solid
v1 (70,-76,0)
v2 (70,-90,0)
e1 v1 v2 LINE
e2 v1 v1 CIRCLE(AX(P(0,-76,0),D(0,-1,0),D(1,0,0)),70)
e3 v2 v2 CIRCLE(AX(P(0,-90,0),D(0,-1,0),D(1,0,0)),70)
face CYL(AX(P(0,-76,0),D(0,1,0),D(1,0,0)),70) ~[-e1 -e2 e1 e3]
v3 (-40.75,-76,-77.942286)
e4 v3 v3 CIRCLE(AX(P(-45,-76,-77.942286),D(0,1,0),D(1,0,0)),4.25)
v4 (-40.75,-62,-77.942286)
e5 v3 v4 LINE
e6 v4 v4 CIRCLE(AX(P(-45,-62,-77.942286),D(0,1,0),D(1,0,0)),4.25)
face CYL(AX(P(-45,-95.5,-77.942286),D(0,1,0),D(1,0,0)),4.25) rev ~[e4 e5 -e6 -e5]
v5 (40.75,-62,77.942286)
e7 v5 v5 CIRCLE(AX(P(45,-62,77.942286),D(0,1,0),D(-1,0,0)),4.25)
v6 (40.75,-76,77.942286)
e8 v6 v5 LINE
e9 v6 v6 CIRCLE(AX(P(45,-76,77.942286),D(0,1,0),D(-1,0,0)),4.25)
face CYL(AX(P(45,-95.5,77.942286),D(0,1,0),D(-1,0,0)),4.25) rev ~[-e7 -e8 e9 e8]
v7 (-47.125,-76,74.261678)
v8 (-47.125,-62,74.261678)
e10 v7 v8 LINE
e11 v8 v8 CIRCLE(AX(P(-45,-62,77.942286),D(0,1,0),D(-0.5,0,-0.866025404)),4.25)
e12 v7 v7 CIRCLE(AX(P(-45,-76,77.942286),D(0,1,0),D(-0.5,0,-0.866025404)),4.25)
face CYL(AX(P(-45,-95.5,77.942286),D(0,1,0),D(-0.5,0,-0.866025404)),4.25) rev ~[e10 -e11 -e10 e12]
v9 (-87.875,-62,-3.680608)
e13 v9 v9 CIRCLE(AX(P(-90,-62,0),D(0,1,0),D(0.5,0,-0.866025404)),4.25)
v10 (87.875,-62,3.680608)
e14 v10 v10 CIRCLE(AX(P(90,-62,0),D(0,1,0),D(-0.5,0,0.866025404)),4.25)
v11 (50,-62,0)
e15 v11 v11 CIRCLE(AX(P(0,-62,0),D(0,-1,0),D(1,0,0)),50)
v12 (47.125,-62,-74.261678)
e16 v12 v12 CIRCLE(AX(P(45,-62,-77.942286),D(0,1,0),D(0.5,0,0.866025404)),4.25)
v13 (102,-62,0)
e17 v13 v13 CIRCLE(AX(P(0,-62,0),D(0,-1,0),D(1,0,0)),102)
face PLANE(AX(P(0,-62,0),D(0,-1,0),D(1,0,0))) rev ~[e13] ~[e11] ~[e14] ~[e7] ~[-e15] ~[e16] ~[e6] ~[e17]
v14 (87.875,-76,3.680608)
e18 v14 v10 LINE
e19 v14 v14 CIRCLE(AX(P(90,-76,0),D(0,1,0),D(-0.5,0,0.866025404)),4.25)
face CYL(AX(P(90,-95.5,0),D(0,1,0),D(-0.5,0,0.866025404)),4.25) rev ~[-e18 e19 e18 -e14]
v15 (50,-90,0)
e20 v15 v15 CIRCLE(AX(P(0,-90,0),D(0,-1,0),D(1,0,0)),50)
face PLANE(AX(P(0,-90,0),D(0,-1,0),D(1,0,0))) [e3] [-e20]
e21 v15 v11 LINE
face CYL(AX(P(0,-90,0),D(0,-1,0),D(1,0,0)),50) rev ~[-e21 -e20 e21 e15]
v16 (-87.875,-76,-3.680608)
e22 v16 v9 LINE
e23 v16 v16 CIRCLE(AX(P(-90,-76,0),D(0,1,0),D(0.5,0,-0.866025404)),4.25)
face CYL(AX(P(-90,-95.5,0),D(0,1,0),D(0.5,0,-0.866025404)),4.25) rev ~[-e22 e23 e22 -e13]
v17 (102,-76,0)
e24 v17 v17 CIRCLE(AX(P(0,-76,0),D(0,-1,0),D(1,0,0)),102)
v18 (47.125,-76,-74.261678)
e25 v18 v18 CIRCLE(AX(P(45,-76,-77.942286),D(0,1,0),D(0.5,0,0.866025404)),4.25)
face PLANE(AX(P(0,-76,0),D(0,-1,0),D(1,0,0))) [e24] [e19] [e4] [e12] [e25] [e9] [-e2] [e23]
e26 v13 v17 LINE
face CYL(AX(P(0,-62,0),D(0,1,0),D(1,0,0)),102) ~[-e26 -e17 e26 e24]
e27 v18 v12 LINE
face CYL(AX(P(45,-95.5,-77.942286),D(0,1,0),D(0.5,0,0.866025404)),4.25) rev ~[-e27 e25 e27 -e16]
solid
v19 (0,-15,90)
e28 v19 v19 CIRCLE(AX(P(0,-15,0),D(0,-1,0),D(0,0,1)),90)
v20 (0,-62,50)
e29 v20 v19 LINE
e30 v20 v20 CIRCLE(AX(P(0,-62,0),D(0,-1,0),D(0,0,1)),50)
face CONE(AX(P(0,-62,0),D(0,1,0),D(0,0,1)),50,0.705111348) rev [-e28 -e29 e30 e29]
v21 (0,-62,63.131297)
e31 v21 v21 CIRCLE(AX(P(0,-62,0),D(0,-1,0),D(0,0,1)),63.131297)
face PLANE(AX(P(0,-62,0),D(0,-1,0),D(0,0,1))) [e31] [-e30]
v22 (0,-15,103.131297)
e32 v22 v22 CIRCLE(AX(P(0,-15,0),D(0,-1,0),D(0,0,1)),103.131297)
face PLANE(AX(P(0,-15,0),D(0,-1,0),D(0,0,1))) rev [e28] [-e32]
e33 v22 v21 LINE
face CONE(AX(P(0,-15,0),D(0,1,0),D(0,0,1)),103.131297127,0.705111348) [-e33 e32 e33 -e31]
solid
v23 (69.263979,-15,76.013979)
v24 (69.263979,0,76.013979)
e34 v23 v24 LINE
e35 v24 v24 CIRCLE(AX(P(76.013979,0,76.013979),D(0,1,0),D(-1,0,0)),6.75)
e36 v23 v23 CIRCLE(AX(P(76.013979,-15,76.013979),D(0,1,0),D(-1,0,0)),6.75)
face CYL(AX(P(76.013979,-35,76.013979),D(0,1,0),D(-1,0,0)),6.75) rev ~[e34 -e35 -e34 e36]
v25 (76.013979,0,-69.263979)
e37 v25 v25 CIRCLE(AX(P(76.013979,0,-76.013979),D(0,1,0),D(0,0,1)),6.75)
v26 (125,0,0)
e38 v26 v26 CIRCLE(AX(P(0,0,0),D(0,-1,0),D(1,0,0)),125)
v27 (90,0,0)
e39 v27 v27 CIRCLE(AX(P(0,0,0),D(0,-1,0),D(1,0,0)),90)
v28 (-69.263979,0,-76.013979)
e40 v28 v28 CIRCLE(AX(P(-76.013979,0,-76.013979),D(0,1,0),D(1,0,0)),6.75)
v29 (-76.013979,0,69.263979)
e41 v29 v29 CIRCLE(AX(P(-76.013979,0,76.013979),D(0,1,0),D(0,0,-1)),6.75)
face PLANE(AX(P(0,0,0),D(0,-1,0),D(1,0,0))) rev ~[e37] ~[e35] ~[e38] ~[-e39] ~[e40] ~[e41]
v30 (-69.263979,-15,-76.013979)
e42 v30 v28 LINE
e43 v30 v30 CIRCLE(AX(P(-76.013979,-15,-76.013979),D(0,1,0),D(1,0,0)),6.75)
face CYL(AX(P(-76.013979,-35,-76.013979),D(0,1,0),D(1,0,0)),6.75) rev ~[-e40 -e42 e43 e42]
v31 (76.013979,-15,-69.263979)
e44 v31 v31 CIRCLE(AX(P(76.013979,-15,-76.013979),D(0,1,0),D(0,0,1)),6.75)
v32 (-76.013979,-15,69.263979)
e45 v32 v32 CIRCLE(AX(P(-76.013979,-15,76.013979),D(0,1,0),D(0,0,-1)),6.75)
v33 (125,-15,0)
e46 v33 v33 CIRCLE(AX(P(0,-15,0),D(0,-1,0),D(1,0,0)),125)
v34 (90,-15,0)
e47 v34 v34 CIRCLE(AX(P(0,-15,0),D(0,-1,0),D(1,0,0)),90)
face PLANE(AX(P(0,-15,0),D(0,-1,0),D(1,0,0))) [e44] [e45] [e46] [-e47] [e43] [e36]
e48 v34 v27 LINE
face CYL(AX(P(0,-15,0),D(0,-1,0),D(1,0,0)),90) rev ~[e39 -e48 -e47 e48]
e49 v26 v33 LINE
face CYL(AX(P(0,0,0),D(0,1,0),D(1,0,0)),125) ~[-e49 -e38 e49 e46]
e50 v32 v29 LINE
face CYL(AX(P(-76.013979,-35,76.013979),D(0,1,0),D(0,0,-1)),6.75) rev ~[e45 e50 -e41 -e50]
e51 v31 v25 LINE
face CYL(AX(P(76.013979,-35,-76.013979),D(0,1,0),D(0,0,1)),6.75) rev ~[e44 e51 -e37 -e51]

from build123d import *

# Parameters (mm, degrees)
F0_R             = 125
F1_DEPTH         = 15
F4_R             = 102
F5_DEPTH         = 14
F6_R             = 70
F7_DEPTH         = 14
F9_D             = 8.5
F9_DEPTH         = 19.5
F9_TIP           = 2.5536576309
F9_COPIES_COUNT  = 6
F2_R             = 90
F10_DEPTH        = 25
F12_D            = 13.5
F12_DEPTH        = 20
F12_TIP          = 4.0558091784
F12_COPIES_COUNT = 4
F13_R            = 50
F14_DEPTH        = 90.001


# Not quite as in the source:
# - a pattern or mirror of a feature is missing from the dataset's text; its kind, count and spacing are read off the source's solid


with BuildPart() as f1:
    # F0 (on Front) → F1 (new body)
    with BuildSketch(Plane.XZ):
        Circle(F0_R)
    extrude(amount=F1_DEPTH)

    # F2 (on face) → F10 (cut)
    with BuildSketch(Plane.XZ.offset(15)):
        Circle(F2_R)
    extrude(amount=-F10_DEPTH, mode=Mode.SUBTRACT)

    # F12
    with Locations(Plane.XZ.offset(15)):
        with Locations((76.0139789776, 76.0139789776)):
            f12 = Hole(F12_D / 2, depth=F12_DEPTH)
            with Locations((0, 0, -(F12_DEPTH + F12_TIP / 2))):  # 118° drill point
                Cone(0, F12_D / 2, F12_TIP, mode=Mode.SUBTRACT)

    # F12_copies: F12 ×4 about axis
    f12_copies_axis = Axis((0, 0, 0), (0, 1, 0))
    for i in range(1, F12_COPIES_COUNT):
        add(f12.rotate(f12_copies_axis, i * 360 / F12_COPIES_COUNT), mode=Mode.SUBTRACT)


with BuildPart() as f5:
    # F4 (on offset) → F5 (new body)
    with BuildSketch(Plane.XZ.offset(62)):
        Circle(F4_R)
    extrude(amount=F5_DEPTH)

    # F6 (on face) → F7 (join)
    with BuildSketch(Plane.XZ.offset(76)):
        Circle(F6_R)
    extrude(amount=F7_DEPTH)

    # F9
    with Locations(Plane.XZ.offset(76)):
        with Locations((45, 77.9422863406)):
            f9 = Hole(F9_D / 2, depth=F9_DEPTH)
            with Locations((0, 0, -(F9_DEPTH + F9_TIP / 2))):  # 118° drill point
                Cone(0, F9_D / 2, F9_TIP, mode=Mode.SUBTRACT)

    # F9_copies: F9 ×6 about axis
    f9_copies_axis = Axis((0, 0, 0), (0, 1, 0))
    for i in range(1, F9_COPIES_COUNT):
        add(f9.rotate(f9_copies_axis, i * 360 / F9_COPIES_COUNT), mode=Mode.SUBTRACT)

    # F13 (on face) → F14 (cut, through all)
    with BuildSketch(Plane.XZ.offset(90)):
        Circle(F13_R)
    extrude(amount=-F14_DEPTH, mode=Mode.SUBTRACT)


with BuildPart() as f16:
    # F15 (on Right) → F16 (revolve)
    with BuildSketch(Plane.YZ):
        Polygon((-62, 63.131297127), (-62, 50), (-15, 90), (-15, 103.131297127), align=None)
    revolve(axis=Axis((0, -76, 0), (0, -1, 0)))


solid = Compound([f1.part, f5.part, f16.part])
